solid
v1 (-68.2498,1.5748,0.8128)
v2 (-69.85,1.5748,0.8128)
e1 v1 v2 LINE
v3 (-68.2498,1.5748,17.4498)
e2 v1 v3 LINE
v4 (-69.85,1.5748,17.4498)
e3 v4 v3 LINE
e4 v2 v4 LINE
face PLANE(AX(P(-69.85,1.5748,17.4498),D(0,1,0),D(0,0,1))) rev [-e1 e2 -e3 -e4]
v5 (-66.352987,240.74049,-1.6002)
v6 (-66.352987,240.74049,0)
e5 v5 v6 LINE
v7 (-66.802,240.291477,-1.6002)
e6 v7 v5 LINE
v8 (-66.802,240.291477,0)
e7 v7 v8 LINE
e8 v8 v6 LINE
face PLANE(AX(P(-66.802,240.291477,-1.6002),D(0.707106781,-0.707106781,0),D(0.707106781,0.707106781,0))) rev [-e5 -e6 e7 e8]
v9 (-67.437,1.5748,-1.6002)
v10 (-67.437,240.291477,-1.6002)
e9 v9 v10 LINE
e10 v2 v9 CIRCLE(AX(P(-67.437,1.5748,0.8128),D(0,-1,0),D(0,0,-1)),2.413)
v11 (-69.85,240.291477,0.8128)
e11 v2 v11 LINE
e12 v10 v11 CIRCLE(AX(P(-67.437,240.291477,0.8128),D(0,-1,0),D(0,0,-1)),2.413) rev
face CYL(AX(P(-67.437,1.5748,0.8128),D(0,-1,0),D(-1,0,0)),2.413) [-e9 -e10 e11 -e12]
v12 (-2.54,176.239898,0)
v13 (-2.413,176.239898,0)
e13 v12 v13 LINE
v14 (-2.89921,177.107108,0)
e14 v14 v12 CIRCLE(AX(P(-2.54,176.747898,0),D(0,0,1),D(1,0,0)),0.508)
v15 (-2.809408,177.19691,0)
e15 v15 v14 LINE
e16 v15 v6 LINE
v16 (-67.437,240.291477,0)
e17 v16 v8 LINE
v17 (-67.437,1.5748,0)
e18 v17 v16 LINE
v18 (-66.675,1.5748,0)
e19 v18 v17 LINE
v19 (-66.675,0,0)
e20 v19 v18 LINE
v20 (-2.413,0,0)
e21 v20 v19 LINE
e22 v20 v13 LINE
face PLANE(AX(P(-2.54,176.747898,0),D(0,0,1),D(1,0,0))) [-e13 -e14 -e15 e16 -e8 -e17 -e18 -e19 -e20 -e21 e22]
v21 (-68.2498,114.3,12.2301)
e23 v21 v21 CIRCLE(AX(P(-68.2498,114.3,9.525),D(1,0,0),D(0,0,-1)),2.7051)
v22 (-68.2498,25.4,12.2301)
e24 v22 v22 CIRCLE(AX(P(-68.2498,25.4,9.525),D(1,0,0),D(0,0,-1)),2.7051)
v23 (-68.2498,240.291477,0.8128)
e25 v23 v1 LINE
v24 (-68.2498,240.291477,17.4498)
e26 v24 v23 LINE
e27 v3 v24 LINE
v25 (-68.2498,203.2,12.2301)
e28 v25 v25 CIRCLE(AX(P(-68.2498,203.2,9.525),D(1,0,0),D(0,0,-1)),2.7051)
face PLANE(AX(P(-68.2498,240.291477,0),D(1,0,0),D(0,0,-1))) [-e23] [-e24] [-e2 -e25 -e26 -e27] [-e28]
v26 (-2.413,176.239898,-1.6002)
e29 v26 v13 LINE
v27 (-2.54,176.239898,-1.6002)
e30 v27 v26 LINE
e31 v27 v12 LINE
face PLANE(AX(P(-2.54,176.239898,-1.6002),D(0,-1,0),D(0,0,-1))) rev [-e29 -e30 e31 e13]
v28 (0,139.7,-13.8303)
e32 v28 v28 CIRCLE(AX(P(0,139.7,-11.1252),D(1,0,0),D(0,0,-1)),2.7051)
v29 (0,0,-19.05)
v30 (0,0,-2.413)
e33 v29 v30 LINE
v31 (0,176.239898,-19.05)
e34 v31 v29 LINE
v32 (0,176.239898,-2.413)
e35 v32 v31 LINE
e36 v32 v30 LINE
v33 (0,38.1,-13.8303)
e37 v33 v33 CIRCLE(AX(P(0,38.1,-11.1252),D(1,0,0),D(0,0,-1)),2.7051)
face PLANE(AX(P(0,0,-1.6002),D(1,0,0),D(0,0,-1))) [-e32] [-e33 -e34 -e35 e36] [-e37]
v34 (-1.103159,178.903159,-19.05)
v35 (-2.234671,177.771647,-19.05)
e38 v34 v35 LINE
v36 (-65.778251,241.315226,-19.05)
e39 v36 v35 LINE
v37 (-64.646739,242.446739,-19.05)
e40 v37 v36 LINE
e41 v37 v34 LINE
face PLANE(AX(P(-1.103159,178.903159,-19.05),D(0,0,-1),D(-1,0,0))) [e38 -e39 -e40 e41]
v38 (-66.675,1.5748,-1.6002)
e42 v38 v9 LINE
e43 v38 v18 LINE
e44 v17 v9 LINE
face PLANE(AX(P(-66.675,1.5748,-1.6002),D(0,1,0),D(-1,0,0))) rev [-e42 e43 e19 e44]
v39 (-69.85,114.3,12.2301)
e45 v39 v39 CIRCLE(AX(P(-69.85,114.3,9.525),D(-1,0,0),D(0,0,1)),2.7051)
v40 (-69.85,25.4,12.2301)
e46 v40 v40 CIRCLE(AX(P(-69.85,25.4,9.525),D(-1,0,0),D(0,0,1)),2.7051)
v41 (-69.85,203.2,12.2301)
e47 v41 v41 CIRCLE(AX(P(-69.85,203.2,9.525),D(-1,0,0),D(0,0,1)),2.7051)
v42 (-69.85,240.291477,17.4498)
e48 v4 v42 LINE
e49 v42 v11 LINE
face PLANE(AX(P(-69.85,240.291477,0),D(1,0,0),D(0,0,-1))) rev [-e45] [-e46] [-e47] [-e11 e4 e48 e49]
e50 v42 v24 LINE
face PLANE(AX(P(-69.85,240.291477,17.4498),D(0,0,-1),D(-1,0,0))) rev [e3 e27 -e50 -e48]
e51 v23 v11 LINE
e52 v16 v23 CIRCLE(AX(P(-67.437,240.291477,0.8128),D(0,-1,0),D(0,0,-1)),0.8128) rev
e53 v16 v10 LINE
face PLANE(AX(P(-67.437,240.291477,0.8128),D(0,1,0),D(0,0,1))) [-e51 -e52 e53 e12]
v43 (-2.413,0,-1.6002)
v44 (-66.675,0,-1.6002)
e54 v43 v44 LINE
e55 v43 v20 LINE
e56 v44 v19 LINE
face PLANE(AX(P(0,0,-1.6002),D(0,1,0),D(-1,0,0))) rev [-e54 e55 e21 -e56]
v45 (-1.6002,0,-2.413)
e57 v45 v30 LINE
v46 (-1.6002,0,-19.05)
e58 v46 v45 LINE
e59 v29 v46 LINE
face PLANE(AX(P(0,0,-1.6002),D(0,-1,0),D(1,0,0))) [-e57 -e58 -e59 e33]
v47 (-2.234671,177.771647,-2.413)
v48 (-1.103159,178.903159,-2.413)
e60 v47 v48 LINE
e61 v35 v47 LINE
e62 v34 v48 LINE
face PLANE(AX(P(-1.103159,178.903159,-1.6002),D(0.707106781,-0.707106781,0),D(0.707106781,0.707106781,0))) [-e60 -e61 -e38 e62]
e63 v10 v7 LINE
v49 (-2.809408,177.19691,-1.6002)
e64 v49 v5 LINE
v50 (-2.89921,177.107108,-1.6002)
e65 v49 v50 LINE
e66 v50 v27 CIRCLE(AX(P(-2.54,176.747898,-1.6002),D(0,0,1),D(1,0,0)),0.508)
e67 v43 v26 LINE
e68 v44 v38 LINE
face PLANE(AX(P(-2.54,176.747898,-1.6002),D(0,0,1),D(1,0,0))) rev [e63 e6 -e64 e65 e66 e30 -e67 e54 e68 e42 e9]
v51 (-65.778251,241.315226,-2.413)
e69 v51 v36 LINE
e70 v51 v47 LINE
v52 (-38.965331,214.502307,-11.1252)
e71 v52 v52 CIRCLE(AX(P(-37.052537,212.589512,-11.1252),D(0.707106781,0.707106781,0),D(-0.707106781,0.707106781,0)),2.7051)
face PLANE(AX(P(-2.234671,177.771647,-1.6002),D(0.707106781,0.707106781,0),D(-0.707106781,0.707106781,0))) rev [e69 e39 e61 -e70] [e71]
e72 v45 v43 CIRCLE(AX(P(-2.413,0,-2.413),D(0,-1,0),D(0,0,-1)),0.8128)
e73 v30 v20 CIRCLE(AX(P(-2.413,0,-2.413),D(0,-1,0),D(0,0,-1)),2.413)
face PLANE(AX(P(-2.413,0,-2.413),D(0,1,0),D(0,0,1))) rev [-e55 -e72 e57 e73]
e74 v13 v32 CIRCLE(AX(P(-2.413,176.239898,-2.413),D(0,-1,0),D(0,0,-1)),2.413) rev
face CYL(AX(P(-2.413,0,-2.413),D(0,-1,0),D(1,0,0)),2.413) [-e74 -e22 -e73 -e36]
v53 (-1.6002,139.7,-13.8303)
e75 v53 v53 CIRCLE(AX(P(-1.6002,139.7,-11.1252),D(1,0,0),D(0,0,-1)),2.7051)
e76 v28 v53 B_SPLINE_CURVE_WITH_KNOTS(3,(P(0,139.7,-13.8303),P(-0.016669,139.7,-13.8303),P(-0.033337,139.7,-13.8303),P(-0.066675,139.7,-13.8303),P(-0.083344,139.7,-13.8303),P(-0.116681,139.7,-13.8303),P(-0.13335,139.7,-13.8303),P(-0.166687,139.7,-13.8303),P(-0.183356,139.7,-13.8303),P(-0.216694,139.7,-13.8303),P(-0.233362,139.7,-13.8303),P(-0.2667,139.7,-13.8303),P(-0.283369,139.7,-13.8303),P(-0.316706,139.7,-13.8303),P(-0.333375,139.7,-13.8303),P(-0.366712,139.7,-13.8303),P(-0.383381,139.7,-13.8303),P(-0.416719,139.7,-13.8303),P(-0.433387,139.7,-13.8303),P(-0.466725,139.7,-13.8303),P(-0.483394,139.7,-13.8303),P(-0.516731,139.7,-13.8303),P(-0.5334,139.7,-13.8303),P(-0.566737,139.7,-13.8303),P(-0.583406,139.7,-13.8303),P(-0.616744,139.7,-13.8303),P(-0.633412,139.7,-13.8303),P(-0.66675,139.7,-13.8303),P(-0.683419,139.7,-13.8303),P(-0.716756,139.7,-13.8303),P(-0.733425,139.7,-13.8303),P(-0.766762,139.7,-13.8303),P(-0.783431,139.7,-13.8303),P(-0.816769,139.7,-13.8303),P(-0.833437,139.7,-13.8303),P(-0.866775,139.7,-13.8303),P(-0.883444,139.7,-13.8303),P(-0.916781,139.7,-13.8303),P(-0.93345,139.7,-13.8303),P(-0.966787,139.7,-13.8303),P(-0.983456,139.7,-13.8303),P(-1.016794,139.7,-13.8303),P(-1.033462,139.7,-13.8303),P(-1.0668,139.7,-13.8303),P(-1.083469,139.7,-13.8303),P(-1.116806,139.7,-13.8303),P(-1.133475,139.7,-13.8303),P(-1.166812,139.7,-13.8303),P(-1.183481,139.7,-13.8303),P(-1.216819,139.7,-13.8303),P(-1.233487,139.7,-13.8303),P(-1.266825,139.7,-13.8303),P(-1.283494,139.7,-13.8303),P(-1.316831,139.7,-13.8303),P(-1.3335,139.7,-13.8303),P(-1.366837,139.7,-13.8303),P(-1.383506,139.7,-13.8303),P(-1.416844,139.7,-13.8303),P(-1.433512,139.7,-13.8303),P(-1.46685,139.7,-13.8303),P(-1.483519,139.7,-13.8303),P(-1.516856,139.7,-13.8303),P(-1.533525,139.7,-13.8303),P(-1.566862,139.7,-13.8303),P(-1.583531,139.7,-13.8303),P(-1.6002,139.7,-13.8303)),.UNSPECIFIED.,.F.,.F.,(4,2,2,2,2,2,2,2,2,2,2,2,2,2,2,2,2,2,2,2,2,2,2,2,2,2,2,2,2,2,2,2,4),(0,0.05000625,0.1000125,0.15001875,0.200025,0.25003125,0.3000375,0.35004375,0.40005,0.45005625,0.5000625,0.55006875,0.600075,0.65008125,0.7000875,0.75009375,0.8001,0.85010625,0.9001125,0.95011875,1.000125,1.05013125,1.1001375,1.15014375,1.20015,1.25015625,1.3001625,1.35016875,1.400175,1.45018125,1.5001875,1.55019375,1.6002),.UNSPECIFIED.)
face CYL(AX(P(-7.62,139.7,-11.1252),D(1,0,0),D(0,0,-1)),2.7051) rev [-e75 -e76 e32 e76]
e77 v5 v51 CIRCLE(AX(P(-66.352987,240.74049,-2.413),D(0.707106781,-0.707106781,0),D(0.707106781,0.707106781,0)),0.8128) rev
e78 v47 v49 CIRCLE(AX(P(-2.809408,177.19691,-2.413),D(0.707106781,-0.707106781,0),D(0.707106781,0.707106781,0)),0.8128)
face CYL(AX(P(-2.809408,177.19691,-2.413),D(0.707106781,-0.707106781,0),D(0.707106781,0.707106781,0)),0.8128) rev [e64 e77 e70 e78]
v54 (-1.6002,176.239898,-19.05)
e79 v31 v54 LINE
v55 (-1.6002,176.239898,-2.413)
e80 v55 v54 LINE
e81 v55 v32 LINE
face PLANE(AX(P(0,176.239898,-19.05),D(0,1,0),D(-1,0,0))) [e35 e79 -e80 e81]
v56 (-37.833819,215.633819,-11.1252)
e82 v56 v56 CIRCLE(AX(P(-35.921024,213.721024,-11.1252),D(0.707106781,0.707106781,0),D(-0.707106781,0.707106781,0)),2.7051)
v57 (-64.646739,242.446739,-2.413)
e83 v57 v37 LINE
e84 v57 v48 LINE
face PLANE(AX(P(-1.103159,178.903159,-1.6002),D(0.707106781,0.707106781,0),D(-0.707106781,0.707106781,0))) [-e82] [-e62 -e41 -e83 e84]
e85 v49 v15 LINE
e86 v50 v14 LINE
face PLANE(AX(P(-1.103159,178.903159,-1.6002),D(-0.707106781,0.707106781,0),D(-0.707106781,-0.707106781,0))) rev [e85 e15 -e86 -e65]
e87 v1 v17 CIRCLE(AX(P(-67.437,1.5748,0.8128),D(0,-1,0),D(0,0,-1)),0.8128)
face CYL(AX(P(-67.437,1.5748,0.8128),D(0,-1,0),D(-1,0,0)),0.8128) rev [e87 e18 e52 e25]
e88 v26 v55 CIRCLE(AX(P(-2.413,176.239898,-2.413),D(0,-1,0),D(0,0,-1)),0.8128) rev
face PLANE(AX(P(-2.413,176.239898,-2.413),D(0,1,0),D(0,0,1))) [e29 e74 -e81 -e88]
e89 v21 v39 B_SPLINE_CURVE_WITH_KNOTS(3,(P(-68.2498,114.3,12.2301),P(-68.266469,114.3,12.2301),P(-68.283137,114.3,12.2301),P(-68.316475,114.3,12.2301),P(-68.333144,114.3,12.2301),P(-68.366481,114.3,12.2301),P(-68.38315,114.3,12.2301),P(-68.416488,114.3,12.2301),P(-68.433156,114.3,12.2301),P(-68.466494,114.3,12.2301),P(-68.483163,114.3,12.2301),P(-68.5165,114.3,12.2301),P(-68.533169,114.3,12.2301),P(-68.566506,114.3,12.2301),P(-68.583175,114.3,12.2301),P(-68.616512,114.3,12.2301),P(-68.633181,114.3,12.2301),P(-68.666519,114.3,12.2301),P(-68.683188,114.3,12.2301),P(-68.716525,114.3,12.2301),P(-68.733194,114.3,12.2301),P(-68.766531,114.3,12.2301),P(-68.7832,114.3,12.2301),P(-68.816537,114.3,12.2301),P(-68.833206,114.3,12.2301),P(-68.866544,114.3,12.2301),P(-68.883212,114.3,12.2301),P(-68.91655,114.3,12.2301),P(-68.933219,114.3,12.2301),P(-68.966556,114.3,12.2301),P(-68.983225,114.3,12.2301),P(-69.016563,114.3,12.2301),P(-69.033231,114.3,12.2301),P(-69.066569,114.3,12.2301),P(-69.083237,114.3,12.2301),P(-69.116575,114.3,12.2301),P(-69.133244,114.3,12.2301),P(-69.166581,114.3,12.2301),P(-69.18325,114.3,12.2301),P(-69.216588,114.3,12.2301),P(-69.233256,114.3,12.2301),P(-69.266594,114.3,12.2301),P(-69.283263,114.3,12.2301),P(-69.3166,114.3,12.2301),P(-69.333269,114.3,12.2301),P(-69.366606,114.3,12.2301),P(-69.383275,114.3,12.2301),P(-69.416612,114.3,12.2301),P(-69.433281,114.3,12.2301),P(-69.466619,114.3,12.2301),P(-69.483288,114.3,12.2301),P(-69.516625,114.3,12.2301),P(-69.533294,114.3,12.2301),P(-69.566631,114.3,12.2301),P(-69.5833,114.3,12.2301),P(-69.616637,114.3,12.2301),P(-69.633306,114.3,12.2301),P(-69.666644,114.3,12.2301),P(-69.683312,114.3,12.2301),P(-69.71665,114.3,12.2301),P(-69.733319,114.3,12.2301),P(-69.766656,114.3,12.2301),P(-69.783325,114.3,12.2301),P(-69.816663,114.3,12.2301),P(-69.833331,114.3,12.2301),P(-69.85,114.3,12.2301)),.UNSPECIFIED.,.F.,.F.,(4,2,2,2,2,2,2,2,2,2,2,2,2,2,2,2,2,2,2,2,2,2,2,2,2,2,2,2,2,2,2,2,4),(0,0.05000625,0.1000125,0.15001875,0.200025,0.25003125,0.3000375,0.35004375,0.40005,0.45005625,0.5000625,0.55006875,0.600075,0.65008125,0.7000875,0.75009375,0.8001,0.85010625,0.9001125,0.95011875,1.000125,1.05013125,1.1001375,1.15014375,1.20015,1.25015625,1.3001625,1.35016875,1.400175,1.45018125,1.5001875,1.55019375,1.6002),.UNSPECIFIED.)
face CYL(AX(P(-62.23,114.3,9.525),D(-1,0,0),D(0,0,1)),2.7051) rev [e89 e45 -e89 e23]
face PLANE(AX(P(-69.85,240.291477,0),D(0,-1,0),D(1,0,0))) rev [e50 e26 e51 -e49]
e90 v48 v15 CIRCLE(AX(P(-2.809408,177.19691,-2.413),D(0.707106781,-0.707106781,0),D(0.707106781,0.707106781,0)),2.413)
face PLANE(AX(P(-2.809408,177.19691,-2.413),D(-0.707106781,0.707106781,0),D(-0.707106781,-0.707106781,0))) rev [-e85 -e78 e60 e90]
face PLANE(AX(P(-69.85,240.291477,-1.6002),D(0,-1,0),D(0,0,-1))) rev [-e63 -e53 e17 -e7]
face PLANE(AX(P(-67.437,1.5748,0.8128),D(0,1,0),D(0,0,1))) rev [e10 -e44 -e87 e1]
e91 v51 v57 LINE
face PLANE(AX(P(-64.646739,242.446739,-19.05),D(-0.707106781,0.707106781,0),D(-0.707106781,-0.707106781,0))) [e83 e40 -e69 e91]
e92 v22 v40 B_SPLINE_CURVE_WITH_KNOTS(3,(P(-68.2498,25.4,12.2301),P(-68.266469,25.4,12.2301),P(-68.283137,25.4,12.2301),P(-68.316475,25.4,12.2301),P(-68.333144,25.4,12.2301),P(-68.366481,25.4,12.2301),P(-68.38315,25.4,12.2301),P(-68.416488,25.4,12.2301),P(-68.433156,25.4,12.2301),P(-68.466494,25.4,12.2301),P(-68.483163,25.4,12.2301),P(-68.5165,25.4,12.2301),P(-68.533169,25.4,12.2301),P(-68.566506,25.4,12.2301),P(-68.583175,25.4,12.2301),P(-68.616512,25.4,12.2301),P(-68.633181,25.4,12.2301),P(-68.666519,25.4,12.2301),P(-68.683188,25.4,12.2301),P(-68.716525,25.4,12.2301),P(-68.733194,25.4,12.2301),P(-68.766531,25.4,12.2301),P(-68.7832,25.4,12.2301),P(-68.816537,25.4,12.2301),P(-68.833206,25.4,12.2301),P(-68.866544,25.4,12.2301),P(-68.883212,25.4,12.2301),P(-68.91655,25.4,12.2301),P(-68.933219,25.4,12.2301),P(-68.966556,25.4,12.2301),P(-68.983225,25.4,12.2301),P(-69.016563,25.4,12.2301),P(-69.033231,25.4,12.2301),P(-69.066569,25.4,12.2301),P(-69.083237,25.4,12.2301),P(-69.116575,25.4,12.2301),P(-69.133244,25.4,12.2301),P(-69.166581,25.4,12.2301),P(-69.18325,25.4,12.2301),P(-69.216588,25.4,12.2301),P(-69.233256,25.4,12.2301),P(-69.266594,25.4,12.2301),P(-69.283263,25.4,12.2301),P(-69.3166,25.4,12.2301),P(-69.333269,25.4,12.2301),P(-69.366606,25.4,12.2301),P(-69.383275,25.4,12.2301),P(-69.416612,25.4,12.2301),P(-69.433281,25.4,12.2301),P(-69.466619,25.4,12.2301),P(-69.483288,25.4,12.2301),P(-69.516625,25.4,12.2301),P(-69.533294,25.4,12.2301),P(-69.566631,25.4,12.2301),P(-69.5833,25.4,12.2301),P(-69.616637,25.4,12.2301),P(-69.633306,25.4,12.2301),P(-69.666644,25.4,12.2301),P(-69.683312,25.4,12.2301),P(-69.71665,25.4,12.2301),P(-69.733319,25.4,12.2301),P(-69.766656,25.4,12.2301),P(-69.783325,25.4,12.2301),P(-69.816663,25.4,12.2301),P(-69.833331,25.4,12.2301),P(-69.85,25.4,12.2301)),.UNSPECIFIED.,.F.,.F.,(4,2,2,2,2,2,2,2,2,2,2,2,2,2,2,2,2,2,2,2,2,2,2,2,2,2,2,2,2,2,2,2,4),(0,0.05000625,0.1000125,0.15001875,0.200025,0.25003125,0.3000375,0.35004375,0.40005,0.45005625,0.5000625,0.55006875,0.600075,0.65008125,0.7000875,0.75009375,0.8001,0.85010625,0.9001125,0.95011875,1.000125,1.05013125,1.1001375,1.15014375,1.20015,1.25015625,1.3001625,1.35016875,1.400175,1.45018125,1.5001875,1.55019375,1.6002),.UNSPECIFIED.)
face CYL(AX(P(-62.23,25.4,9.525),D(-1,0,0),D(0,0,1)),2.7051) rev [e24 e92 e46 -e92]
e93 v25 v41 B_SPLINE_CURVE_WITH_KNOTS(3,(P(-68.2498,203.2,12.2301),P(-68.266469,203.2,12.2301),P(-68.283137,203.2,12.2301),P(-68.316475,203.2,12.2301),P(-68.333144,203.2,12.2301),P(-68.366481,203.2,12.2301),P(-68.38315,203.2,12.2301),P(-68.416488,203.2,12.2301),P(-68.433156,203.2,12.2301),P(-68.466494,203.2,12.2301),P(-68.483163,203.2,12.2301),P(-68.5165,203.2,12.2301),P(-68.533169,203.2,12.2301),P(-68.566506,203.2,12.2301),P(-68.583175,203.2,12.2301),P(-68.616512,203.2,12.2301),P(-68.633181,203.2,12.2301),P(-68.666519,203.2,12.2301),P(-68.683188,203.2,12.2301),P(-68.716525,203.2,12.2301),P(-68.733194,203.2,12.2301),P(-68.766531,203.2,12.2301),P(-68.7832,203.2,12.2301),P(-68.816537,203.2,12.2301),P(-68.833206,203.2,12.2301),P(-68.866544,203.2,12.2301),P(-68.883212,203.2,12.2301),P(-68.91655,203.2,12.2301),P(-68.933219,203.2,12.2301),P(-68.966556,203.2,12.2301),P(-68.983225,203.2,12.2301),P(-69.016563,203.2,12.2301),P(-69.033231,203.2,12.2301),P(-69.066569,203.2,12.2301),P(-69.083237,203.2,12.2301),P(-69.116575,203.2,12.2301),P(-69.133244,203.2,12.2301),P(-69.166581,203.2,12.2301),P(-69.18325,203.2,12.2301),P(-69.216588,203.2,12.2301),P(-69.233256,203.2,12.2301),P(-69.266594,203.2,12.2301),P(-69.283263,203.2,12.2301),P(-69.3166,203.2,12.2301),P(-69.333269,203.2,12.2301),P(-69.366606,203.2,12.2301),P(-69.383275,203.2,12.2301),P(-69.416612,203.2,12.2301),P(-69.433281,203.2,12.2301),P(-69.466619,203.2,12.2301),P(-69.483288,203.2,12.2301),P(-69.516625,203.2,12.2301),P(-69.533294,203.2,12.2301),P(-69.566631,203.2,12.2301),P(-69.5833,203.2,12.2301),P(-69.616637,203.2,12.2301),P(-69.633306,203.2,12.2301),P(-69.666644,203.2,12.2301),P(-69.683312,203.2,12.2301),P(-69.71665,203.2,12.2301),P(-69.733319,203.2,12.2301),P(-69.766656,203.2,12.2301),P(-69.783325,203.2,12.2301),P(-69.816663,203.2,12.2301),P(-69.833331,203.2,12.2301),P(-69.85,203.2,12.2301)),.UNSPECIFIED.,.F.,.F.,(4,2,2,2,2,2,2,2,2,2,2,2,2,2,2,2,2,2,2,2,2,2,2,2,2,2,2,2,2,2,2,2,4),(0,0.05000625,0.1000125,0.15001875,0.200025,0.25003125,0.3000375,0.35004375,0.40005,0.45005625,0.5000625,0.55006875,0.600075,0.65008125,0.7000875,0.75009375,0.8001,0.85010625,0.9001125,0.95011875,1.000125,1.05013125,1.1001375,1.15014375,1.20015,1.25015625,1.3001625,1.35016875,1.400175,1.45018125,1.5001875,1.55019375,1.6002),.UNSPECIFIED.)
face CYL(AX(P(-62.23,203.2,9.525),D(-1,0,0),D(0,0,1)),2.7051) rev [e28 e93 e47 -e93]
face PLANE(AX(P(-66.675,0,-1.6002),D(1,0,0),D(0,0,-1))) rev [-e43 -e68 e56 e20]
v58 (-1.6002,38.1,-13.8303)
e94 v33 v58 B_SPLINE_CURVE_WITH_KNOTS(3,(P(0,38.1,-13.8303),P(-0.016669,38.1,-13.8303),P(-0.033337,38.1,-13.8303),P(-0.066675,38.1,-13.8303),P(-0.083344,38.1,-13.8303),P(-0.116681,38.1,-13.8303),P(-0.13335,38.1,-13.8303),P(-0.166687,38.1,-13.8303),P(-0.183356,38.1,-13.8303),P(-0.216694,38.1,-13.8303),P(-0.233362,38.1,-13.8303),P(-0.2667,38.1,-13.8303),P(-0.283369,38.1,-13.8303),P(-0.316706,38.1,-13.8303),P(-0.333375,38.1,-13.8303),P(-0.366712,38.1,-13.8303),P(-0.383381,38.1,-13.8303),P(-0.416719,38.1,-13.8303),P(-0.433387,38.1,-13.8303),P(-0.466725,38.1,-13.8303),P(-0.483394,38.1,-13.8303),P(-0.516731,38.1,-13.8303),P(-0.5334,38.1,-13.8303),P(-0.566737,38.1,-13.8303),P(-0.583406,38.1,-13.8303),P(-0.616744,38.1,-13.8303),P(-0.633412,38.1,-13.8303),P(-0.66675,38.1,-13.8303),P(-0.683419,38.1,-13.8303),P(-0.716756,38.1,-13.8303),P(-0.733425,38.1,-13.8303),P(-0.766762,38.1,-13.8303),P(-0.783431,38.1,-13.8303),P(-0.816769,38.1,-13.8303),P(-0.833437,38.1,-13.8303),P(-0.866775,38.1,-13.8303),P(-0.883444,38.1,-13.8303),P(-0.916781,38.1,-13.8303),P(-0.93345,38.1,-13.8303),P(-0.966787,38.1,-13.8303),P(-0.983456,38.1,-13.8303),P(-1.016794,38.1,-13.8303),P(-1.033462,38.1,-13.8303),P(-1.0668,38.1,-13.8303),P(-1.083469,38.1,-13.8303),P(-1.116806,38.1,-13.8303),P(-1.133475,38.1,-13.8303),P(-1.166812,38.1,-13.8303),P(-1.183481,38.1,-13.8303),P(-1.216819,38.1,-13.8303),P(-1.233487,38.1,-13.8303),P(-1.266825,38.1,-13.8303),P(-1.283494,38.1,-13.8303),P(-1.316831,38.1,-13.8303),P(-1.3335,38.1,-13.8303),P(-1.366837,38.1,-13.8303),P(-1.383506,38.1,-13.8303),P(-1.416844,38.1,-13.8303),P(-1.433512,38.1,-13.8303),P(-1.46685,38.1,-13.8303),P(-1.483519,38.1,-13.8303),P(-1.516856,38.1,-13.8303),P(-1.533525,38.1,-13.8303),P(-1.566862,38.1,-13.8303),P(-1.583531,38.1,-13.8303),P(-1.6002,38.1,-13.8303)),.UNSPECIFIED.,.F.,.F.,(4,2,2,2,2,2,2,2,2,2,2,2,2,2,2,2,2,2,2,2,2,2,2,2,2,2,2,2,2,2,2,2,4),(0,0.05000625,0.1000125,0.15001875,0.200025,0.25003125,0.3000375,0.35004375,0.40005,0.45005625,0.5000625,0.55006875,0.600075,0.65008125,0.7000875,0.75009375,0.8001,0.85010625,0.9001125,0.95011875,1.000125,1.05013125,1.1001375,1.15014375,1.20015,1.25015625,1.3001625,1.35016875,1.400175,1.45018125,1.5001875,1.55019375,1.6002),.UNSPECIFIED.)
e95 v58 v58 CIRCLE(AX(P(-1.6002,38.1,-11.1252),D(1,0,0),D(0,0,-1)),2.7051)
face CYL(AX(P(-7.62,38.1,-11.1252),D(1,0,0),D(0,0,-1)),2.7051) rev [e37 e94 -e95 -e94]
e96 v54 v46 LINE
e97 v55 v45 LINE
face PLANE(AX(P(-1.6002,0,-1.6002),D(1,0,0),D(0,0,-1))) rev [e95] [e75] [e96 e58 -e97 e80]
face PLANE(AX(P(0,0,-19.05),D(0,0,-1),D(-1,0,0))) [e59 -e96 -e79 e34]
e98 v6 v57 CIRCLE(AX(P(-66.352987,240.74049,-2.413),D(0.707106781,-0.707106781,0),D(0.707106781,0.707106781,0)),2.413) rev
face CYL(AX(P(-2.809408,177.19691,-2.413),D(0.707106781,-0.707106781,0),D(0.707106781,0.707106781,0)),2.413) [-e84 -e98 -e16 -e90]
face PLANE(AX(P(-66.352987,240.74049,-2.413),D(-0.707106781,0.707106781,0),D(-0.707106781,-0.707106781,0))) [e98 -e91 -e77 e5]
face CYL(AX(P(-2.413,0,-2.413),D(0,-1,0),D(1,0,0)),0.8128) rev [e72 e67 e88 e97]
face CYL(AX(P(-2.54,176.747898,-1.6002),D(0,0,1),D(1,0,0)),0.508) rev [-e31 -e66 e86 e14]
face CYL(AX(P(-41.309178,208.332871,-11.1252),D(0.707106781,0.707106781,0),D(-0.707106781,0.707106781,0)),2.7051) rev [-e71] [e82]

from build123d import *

# Parameters (mm, degrees)
BASE_FLANGE1_DEPTH           = 1.6002
EDGE_FLANGE1_STRIP_W         = 8.0264
EDGE_FLANGE1_STRIP_H         = 1.6002
EDGE_FLANGE1_STRIP_CUT_DEPTH = 176.239897552
EDGE_FLANGE1_DEPTH           = 176.239897552
EDGE_FLANGE2_STRIP_W         = 8.0264
EDGE_FLANGE2_STRIP_H         = 1.6002
EDGE_FLANGE2_STRIP_CUT_DEPTH = 89.864191945
EDGE_FLANGE2_DEPTH           = 89.864191945
EDGE_FLANGE3_STRIP_W         = 8.0264
EDGE_FLANGE3_STRIP_H         = 1.6002
EDGE_FLANGE3_STRIP_CUT_DEPTH = 238.716677062
EDGE_FLANGE3_DEPTH           = 238.716677062
SKETCH18_R                   = 2.7051
CUT_EXTRUDE3_DEPTH           = 7.62
SKETCH19_R                   = 2.7051
CUT_EXTRUDE4_DEPTH           = 7.62
SKETCH20_R                   = 2.7051
CUT_EXTRUDE5_DEPTH           = 7.62


# Read off the part's stored shape, not the designer's step: Base-Flange1
# Sheet-metal steps are written as plain solids
with BuildPart() as part:
    # Base-Flange1 outline → Base-Flange1 (new body)
    with BuildSketch(Plane(origin=(0, 0, 0), x_dir=(1, 0, 0), z_dir=(0, 0, -1))):
        with BuildLine():
            Line((0, 0), (-66.675, 0))
            Line((-66.675, 0), (-66.675, -1.5748))
            Line((-66.675, -1.5748), (-69.85, -1.5748))
            Line((-69.85, -1.5748), (-69.85, -240.291477062))
            Line((-69.85, -240.291477062), (-66.802, -240.291477062))
            Line((-66.802, -240.291477062), (-64.646738531, -242.446738531))
            Line((-64.646738531, -242.446738531), (-1.103159021, -178.903159021))
            Line((-1.103159021, -178.903159021), (-2.899210245, -177.107107796))
            ThreePointArc((-2.899210245, -177.107107796), (-3.009330803, -176.553494368), (-2.54, -176.239897552))
            Line((-2.54, -176.239897552), (0, -176.239897552))
            Line((0, -176.239897552), (0, 0))
        make_face()
    extrude(amount=BASE_FLANGE1_DEPTH)

    # Edge-Flange1 strip (across the edge) → Edge-Flange1 strip cut (cut)
    with BuildSketch(Plane(origin=(0, 176.239897552, -1.6002), x_dir=(-1, 0, 0), z_dir=(0, -1, 0))):
        with Locations((-1.6002, -0.8001)):
            Rectangle(EDGE_FLANGE1_STRIP_W, EDGE_FLANGE1_STRIP_H)
    extrude(amount=EDGE_FLANGE1_STRIP_CUT_DEPTH, mode=Mode.SUBTRACT)

    # Edge-Flange1 section (across the edge) → Edge-Flange1 (add)
    with BuildSketch(Plane(origin=(0, 176.239897552, -1.6002), x_dir=(-1, 0, 0), z_dir=(0, -1, 0))):
        with BuildLine():
            Line((0, 0.8128), (0, 17.4498))
            Line((0, 17.4498), (1.6002, 17.4498))
            Line((1.6002, 17.4498), (1.6002, 0.8128))
            ThreePointArc((1.6002, 0.8128), (1.838263608, 0.238063608), (2.413, 0))
            Line((2.413, 0), (2.413, -1.6002))
            ThreePointArc((2.413, -1.6002), (0.706751337, -0.893448663), (0, 0.8128))
        make_face()
    extrude(amount=EDGE_FLANGE1_DEPTH)

    # Edge-Flange2 strip (across the edge) → Edge-Flange2 strip cut (cut)
    with BuildSketch(Plane(origin=(-64.646738531, 242.446738531, -1.6002), x_dir=(-0.7071067811865479, -0.7071067811865472, -3.58046925441613e-15), z_dir=(0.7071067811865472, -0.7071067811865479, 0))):
        with Locations((-1.6002, -0.8001)):
            Rectangle(EDGE_FLANGE2_STRIP_W, EDGE_FLANGE2_STRIP_H)
    extrude(amount=EDGE_FLANGE2_STRIP_CUT_DEPTH, mode=Mode.SUBTRACT)

    # Edge-Flange2 section (across the edge) → Edge-Flange2 (add)
    with BuildSketch(Plane(origin=(-64.646738531, 242.446738531, -1.6002), x_dir=(-0.7071067811865479, -0.7071067811865472, -3.58046925441613e-15), z_dir=(0.7071067811865472, -0.7071067811865479, 0))):
        with BuildLine():
            Line((0, 0.8128), (0, 17.4498))
            Line((0, 17.4498), (1.6002, 17.4498))
            Line((1.6002, 17.4498), (1.6002, 0.8128))
            ThreePointArc((1.6002, 0.8128), (1.838263608, 0.238063608), (2.413, 0))
            Line((2.413, 0), (2.413, -1.6002))
            ThreePointArc((2.413, -1.6002), (0.706751337, -0.893448663), (0, 0.8128))
        make_face()
    extrude(amount=EDGE_FLANGE2_DEPTH)

    # Edge-Flange3 strip (across the edge) → Edge-Flange3 strip cut (cut)
    with BuildSketch(Plane(origin=(-69.85, 240.291477062, 0), x_dir=(1, 0, 0), z_dir=(0, -1, 0))):
        with Locations((-1.6002, -0.8001)):
            Rectangle(EDGE_FLANGE3_STRIP_W, EDGE_FLANGE3_STRIP_H)
    extrude(amount=EDGE_FLANGE3_STRIP_CUT_DEPTH, mode=Mode.SUBTRACT)

    # Edge-Flange3 section (across the edge) → Edge-Flange3 (add)
    with BuildSketch(Plane(origin=(-69.85, 240.291477062, 0), x_dir=(1, 0, 0), z_dir=(0, -1, 0))):
        with BuildLine():
            Line((0, 0.8128), (0, 17.4498))
            Line((0, 17.4498), (1.6002, 17.4498))
            Line((1.6002, 17.4498), (1.6002, 0.8128))
            ThreePointArc((1.6002, 0.8128), (1.838263608, 0.238063608), (2.413, 0))
            Line((2.413, 0), (2.413, -1.6002))
            ThreePointArc((2.413, -1.6002), (0.706751337, -0.893448663), (0, 0.8128))
        make_face()
    extrude(amount=EDGE_FLANGE3_DEPTH)

    # Sketch18 → Cut-Extrude3 (cut)
    with BuildSketch(Plane(origin=(0, 0, 0), x_dir=(0, 0, -1), z_dir=(1, 0, 0))):
        with Locations((11.1252, 38.1)):
            Circle(SKETCH18_R)
        with Locations((11.1252, 139.7)):
            Circle(SKETCH18_R)
    extrude(amount=-CUT_EXTRUDE3_DEPTH, mode=Mode.SUBTRACT)

    # Sketch19 → Cut-Extrude4 (cut)
    with BuildSketch(Plane(origin=(88.9, 88.9, 0), x_dir=(0, 0, -1), z_dir=(0.7071067811865517, 0.7071067811865434, 3.37416286723297e-15))):
        with Locations(Location((11.1252, 176.523585695, 0), (0, 0, 90))):
            Circle(SKETCH19_R)
    extrude(amount=-CUT_EXTRUDE4_DEPTH, mode=Mode.SUBTRACT)

    # Sketch20 → Cut-Extrude5 (cut)
    with BuildSketch(Plane.ZY.offset(69.85)):
        with Locations((9.525, 25.4)):
            Circle(SKETCH20_R)
        with Locations((9.525, 114.3)):
            Circle(SKETCH20_R)
        with Locations((9.525, 203.2)):
            Circle(SKETCH20_R)
    extrude(amount=-CUT_EXTRUDE5_DEPTH, mode=Mode.SUBTRACT)


solid = part.part
